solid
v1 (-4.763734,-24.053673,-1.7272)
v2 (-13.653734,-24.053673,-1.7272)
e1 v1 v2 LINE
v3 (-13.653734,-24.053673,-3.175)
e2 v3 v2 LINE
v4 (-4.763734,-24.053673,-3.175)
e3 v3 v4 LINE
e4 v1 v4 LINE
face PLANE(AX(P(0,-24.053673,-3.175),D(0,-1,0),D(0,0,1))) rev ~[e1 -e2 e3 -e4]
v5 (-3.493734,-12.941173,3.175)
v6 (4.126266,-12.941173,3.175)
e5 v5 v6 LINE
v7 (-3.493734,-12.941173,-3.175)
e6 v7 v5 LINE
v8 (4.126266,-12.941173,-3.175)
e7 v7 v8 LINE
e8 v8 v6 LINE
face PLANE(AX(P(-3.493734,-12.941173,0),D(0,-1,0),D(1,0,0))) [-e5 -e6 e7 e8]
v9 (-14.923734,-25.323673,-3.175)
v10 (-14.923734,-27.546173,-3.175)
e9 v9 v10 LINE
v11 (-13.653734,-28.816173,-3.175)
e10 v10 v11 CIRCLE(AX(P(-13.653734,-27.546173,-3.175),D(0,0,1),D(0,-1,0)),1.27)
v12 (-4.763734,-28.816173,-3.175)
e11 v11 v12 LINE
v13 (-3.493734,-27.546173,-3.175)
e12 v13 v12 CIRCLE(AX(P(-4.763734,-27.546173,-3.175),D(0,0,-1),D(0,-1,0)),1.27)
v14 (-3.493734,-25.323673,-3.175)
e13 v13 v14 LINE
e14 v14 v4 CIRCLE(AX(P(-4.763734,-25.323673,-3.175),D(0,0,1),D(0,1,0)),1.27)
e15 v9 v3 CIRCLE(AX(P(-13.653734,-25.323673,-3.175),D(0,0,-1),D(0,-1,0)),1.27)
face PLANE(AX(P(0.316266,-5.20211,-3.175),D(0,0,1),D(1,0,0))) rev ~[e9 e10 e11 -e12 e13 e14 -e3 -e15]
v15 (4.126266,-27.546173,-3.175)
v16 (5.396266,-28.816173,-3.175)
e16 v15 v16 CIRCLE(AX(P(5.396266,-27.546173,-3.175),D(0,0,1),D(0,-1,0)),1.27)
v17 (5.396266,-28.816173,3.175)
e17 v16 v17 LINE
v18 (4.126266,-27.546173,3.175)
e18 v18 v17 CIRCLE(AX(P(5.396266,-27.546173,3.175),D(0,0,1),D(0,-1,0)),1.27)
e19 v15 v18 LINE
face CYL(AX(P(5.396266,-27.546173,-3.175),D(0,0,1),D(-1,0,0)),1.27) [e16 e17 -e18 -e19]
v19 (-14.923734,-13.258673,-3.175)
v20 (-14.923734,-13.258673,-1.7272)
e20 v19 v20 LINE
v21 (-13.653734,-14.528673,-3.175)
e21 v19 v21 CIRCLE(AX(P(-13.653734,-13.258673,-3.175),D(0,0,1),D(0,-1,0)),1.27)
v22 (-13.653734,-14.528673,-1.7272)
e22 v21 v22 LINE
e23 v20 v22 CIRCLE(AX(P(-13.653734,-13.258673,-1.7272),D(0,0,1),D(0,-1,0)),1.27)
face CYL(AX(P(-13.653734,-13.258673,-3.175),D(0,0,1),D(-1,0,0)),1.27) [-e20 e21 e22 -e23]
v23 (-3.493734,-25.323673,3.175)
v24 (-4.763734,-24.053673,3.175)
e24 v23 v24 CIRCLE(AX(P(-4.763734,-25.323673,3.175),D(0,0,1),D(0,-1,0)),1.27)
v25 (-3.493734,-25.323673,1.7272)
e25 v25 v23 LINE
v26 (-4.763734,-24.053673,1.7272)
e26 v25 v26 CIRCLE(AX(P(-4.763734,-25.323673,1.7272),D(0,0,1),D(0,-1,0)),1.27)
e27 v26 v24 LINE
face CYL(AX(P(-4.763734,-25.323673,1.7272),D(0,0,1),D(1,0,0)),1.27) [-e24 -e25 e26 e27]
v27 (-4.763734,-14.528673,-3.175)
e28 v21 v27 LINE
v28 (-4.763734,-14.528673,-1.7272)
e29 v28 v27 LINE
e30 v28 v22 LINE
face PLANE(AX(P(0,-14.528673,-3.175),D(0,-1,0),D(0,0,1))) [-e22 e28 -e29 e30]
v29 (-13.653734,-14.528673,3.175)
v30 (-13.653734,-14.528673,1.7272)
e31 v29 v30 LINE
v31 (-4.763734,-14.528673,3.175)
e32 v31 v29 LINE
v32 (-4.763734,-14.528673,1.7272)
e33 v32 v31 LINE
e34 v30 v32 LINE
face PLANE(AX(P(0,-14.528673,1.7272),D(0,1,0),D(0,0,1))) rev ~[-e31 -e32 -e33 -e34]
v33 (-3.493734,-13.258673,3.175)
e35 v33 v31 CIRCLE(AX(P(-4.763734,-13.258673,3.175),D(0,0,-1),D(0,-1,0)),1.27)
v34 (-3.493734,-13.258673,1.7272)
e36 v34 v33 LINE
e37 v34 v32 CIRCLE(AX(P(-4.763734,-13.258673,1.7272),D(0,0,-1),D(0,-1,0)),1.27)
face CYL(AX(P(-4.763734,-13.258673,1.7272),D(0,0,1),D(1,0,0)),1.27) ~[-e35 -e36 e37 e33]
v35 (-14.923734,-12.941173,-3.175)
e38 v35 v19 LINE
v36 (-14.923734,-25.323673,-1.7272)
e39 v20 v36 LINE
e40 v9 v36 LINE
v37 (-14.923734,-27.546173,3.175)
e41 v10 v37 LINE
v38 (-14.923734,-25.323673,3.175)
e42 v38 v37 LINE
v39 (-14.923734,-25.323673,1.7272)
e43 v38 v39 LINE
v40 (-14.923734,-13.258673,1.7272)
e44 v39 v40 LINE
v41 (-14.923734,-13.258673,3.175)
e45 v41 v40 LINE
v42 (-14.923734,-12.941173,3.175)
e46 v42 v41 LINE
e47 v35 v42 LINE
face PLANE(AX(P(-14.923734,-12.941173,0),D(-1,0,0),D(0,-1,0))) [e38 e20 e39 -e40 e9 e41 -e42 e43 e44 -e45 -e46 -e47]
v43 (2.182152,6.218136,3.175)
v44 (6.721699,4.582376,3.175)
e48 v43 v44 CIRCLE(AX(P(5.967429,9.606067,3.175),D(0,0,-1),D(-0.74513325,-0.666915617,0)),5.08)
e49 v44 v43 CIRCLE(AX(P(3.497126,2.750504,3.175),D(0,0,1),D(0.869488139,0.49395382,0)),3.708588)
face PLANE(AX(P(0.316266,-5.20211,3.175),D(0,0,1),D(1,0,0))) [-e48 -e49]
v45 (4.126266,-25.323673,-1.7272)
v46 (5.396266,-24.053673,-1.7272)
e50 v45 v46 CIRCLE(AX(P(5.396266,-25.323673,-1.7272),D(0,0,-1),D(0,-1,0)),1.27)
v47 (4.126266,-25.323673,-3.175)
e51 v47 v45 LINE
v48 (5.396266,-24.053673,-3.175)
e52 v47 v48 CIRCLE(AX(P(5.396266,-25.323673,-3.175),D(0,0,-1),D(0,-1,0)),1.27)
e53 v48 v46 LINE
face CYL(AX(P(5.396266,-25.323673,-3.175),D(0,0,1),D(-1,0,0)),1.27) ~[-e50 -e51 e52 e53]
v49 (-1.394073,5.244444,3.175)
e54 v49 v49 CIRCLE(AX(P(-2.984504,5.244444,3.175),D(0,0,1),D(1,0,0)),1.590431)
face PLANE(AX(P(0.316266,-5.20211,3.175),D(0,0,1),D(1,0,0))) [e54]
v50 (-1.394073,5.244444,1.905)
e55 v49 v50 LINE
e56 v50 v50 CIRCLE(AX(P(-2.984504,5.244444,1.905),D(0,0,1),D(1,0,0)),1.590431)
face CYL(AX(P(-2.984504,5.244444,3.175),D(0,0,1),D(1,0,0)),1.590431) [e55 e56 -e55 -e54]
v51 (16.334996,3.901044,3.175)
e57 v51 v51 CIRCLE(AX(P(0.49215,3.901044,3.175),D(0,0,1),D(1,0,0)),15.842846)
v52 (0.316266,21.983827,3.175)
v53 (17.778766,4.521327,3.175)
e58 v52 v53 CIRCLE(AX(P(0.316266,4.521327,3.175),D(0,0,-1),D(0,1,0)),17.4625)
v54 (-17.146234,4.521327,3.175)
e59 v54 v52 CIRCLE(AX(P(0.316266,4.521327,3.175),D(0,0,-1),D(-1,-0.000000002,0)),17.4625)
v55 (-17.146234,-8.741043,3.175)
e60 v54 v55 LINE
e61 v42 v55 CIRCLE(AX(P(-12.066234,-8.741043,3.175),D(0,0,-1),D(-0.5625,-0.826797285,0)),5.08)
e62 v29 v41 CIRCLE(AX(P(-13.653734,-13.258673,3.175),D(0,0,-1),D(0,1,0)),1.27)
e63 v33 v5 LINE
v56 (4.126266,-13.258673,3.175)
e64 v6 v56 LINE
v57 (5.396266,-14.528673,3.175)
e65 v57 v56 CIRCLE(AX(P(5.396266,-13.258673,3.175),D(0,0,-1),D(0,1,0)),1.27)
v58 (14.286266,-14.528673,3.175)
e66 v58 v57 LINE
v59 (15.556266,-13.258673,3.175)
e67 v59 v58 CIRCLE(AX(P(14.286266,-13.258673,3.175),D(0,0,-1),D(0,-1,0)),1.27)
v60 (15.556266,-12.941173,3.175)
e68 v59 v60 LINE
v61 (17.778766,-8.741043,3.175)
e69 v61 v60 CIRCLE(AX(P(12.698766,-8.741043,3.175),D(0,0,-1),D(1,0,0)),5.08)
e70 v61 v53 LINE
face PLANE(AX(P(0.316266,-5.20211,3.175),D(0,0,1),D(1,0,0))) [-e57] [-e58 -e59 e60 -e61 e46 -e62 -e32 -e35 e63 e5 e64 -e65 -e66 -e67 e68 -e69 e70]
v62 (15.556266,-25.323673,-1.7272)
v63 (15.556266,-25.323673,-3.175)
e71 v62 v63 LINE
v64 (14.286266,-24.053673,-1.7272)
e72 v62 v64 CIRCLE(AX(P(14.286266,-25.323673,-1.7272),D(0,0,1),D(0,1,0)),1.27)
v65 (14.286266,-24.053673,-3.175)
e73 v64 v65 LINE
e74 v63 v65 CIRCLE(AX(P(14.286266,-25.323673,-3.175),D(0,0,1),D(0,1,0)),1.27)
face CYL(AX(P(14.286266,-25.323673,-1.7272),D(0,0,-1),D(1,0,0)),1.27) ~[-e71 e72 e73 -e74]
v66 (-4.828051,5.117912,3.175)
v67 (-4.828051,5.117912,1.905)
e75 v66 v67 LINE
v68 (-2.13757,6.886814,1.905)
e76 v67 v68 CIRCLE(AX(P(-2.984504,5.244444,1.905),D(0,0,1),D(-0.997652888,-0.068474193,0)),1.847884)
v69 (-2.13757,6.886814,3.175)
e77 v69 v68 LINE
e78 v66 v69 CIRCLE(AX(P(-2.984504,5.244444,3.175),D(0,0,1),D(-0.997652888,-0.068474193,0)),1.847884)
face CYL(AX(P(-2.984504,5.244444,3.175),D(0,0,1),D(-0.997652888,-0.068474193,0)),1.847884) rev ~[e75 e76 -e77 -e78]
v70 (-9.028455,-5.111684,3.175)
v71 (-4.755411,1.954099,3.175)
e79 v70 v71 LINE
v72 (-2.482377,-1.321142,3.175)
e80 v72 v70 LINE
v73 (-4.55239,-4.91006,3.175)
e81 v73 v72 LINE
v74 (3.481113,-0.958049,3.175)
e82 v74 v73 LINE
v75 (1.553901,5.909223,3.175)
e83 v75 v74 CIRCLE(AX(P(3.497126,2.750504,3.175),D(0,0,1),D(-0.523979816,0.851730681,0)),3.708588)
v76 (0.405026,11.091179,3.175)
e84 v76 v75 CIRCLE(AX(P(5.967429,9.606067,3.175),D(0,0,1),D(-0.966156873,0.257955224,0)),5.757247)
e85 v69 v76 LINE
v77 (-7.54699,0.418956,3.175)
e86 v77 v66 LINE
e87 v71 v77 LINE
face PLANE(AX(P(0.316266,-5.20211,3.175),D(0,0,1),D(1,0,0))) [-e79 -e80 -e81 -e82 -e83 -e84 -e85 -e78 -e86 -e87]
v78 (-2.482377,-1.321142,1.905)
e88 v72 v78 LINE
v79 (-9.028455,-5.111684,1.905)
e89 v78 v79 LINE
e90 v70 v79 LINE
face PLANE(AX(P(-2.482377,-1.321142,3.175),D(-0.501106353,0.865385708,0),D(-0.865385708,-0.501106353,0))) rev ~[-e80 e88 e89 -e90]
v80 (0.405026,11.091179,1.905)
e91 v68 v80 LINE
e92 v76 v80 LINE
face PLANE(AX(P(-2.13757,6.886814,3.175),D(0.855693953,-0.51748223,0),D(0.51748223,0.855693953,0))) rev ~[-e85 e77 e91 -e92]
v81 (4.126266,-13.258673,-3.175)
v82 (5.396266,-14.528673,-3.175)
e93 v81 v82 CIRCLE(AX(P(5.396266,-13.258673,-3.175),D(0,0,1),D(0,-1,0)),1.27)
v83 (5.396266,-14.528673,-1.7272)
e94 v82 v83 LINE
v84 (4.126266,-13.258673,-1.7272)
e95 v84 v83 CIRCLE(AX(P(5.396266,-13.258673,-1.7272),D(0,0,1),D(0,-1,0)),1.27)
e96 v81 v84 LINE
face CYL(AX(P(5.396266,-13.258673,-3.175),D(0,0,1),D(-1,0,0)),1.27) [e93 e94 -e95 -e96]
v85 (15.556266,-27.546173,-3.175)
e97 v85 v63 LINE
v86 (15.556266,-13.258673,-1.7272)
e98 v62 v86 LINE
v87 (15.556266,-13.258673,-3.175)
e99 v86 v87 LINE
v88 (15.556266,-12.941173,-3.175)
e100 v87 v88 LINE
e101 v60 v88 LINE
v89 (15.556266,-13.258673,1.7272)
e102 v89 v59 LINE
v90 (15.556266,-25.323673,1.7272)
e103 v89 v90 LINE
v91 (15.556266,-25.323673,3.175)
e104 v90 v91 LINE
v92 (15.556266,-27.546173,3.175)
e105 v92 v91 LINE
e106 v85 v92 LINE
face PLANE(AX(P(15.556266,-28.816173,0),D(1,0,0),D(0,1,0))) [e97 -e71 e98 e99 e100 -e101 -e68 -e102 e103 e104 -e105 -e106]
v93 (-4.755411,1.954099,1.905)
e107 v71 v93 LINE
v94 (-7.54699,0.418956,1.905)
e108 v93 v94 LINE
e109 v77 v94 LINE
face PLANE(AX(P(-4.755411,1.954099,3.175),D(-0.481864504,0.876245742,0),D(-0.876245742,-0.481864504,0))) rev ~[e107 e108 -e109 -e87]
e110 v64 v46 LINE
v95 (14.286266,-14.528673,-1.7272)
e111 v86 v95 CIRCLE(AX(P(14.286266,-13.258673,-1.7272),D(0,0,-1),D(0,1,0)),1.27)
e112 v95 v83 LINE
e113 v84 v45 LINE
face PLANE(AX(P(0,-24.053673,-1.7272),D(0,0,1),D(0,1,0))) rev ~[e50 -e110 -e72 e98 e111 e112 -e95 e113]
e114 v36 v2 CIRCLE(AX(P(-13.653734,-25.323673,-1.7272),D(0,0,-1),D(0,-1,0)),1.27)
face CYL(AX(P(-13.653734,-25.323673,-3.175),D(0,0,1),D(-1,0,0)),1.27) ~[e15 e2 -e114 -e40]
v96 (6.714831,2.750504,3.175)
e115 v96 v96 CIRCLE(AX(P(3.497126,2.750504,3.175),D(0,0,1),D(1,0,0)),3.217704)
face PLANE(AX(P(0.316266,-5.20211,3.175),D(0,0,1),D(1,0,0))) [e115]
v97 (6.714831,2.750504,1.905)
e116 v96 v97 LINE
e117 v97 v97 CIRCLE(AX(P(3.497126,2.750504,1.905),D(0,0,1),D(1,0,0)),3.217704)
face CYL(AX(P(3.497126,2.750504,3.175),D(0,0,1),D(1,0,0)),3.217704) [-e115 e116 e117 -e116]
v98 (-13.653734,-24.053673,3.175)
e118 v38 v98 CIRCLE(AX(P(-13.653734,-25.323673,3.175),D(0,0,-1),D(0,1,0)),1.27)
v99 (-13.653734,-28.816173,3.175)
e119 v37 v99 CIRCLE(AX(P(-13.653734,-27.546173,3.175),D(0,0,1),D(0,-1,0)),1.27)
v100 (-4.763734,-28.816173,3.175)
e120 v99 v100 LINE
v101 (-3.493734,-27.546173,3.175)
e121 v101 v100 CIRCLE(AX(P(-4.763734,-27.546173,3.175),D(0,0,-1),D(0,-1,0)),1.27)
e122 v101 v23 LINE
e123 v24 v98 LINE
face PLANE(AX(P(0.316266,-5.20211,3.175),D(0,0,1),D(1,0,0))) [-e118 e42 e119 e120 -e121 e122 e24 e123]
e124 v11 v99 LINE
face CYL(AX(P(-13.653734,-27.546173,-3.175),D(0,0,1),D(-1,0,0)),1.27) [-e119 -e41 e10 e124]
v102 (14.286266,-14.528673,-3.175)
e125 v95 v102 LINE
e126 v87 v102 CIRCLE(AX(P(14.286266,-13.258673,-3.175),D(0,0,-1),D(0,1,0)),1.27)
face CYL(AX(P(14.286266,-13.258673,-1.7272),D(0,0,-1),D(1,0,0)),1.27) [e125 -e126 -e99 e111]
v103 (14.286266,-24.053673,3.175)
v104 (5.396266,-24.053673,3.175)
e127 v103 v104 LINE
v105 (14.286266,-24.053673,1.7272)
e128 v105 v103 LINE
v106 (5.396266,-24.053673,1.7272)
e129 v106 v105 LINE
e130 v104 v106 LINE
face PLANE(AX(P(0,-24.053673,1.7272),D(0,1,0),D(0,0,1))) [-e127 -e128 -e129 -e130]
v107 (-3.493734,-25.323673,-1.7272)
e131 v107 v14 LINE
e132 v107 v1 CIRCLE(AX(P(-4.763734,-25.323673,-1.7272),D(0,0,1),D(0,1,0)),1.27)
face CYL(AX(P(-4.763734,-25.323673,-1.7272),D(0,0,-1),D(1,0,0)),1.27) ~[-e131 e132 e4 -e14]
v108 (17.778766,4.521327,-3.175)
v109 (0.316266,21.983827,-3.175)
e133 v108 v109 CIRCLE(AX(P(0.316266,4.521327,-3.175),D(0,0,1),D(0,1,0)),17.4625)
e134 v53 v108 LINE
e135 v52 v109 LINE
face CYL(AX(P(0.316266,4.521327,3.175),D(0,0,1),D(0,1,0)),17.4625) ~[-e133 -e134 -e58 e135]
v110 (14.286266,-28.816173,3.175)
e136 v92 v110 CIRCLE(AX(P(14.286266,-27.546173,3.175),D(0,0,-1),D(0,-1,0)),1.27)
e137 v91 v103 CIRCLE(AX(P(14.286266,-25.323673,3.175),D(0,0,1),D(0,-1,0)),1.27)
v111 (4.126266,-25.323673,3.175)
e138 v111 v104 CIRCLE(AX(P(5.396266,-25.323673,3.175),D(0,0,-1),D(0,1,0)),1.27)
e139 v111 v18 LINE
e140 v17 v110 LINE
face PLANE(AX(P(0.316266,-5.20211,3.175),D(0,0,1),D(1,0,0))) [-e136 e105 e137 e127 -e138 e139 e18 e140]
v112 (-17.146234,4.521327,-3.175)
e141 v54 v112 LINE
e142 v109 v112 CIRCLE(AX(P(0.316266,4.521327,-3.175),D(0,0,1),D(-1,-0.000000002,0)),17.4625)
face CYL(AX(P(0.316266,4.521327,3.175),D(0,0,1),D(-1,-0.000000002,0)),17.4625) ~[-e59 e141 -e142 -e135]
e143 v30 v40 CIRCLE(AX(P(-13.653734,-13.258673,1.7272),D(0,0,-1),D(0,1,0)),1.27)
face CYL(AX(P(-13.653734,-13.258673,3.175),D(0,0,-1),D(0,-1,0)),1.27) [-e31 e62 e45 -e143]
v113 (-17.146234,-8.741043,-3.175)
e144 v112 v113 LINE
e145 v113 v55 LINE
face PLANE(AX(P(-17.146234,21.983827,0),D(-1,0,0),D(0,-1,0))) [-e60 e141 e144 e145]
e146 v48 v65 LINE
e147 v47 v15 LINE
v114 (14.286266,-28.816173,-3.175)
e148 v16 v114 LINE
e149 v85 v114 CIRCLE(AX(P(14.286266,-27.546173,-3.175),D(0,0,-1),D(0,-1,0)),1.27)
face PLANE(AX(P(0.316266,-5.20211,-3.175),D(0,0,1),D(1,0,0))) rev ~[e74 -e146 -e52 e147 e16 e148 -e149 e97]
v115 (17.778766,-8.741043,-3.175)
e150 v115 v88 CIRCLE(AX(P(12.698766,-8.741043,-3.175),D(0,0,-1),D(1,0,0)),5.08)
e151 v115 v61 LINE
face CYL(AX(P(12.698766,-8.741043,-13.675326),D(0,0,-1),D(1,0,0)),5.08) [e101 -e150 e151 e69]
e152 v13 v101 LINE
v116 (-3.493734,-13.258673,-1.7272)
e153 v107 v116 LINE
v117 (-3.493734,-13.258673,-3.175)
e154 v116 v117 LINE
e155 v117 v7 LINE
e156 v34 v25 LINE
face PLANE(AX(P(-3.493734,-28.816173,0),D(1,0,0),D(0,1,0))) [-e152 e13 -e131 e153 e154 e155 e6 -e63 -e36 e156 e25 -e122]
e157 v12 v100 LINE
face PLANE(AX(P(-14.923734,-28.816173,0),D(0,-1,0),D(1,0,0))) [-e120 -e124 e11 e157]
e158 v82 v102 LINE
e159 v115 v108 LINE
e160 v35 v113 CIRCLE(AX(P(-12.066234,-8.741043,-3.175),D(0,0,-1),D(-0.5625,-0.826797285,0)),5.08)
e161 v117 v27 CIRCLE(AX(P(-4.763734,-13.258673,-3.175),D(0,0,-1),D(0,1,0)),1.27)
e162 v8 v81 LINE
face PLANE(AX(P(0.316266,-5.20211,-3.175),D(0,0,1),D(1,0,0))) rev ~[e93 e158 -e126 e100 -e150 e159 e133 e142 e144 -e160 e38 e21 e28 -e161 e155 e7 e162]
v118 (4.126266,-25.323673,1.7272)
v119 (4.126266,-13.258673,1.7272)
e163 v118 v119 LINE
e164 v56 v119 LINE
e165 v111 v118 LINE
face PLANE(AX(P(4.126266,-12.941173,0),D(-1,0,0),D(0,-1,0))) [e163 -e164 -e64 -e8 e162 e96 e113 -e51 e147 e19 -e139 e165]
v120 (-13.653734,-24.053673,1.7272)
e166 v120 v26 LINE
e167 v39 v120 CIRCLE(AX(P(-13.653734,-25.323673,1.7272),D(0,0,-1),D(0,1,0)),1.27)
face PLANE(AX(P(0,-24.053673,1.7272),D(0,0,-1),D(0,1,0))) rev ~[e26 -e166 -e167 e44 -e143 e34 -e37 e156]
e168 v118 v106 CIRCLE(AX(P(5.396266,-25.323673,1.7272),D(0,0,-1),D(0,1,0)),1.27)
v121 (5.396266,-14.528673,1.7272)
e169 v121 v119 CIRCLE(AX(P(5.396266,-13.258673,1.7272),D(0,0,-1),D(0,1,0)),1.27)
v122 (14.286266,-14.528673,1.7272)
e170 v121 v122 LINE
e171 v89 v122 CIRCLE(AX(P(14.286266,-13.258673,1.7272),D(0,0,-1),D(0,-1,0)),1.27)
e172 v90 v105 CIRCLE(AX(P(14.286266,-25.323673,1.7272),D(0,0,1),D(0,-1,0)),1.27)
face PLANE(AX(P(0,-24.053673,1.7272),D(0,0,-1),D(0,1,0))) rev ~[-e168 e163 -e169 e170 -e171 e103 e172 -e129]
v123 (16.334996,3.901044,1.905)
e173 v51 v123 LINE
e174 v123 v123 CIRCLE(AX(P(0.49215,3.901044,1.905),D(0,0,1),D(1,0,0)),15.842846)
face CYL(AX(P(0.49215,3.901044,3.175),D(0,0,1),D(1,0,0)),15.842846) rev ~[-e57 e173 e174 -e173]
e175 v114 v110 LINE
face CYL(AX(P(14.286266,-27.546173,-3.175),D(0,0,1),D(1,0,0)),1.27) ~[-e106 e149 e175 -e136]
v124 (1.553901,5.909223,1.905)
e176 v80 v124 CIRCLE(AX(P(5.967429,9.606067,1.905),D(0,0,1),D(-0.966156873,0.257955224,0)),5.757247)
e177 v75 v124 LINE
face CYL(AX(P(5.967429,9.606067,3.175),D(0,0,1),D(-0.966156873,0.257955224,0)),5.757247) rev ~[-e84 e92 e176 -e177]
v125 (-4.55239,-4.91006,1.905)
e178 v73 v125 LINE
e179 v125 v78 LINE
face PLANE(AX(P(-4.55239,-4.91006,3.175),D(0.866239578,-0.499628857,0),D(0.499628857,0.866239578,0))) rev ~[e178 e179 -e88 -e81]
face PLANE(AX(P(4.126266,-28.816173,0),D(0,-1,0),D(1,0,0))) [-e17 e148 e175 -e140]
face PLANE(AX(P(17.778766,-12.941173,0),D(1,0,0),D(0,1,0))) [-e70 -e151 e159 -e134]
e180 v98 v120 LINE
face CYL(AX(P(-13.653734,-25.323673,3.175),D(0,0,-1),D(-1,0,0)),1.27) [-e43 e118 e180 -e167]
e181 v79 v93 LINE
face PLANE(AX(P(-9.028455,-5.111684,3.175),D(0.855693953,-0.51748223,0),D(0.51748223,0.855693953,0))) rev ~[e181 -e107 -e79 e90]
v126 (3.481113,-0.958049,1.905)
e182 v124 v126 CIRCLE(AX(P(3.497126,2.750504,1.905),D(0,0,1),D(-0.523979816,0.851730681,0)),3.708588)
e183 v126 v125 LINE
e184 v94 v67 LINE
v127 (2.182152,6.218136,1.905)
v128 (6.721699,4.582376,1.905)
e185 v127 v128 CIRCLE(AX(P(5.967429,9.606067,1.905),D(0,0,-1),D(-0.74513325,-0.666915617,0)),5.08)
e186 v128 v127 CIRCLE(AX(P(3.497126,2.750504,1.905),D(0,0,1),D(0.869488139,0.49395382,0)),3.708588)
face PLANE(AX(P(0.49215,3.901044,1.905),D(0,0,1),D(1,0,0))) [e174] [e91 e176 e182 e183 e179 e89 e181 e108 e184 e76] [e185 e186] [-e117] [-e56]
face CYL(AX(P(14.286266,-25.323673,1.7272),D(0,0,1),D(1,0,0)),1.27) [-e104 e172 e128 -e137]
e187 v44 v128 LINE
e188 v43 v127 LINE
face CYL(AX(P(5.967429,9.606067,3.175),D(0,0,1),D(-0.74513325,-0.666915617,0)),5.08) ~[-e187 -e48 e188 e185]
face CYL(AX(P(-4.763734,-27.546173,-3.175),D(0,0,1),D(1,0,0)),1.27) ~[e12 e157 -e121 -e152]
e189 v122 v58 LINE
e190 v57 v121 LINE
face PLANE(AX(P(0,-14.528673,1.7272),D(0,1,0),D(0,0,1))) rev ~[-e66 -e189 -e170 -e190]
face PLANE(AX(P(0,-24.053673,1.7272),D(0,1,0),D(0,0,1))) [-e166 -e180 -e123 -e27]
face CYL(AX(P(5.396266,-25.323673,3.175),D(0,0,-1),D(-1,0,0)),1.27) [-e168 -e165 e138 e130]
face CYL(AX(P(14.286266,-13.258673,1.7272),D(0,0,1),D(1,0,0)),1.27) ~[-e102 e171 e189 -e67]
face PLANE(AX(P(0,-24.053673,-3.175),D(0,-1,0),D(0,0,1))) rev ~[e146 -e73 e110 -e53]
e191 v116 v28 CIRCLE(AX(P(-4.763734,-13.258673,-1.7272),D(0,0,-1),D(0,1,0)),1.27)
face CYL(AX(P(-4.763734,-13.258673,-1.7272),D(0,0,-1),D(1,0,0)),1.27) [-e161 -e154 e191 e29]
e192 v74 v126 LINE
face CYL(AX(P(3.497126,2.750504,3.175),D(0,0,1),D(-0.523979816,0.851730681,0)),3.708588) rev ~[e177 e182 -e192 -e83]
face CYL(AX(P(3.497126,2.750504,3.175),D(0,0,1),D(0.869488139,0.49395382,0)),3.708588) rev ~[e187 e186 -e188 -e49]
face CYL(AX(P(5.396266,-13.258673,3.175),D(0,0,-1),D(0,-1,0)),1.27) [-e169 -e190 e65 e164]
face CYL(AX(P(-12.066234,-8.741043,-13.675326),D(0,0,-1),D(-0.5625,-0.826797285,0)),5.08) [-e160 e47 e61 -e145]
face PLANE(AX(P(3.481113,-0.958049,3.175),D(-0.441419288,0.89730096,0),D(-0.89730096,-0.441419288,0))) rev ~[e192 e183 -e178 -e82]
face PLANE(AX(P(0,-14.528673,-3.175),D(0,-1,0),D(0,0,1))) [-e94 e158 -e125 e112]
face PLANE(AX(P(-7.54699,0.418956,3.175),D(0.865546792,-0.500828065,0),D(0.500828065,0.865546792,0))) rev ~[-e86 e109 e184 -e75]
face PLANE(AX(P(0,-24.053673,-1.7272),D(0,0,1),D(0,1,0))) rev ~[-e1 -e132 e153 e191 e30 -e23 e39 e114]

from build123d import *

# Parameters (mm, degrees)
F1_DEPTH    = 3.175
F2_W        = 9.525
F2_H        = 1.4478
F3_DEPTH    = 25.4
F4_R        = 15.842845787
F4_R_2      = 3.2177044056
F4_R_3      = 1.5904309239
F5_DEPTH    = 1.27
F6_T1_DEPTH = 31.75
F6_T3_DEPTH = 27.3506510316
F7_R        = 1.27
F9_DEPTH    = 25.4


# Not quite as in the source:
# - a fillet or chamfer that OpenCascade refuses, or shapes differently, is made with other operations: its cross-section is extruded or revolved along the edge and cut away or added


with BuildPart() as f1:
    # F0 (on Top) → F1 (new body, symmetric)
    with BuildSketch(Plane.XY):
        Polygon((17.7787664203, 21.9838270611), (-17.1462335797, 21.9838270611), (-17.1462335797, -12.9411729389), (-14.9237335797, -12.9411729389), (-14.9237335797, -28.8161729389), (-3.4937335797, -28.8161729389), (-3.4937335797, -12.9411729389), (4.1262664203, -12.9411729389), (4.1262664203, -28.8161729389), (15.5562664203, -28.8161729389), (15.5562664203, -12.9411729389), (17.7787664203, -12.9411729389), align=None)
    extrude(amount=F1_DEPTH, both=True)

    # F2 (on Right) → F3 (cut, symmetric)
    with BuildSketch(Plane.YZ):
        with Locations((-19.2911729389, -2.4511)):
            Rectangle(F2_W, F2_H)
        with Locations((-19.2911729389, 2.4511)):
            Rectangle(F2_W, F2_H)
    extrude(amount=F3_DEPTH, both=True, mode=Mode.SUBTRACT)

    # F4 (on face) → F5 (cut)
    with BuildSketch(Plane.XY.offset(3.175)):
        with Locations((0.4921501707, 3.9010436143)):
            Circle(F4_R)
        with BuildLine():
            Line((-2.1375703251, 6.8868143019), (0.4050256131, 11.0911789057))
            ThreePointArc((0.4050256131, 11.0911789057), (0.3466666466, 8.3599053372), (1.5539010716, 5.9092225511))
            ThreePointArc((1.5539010716, 5.9092225511), (-0.0735190255, 1.7484484648), (3.4811131017, -0.9580488308))
            Line((3.4811131017, -0.9580488308), (-4.5523895124, -4.9100595401))
            Line((-4.5523895124, -4.9100595401), (-2.4823771265, -1.3211422242))
            Line((-2.4823771265, -1.3211422242), (-9.0284545614, -5.1116843583))
            Line((-9.0284545614, -5.1116843583), (-4.7554110557, 1.9540993141))
            Line((-4.7554110557, 1.9540993141), (-7.5469899631, 0.4189560082))
            Line((-7.5469899631, 0.4189560082), (-4.8280507742, 5.1179121089))
            ThreePointArc((-4.8280507742, 5.1179121089), (-1.9693373897, 3.7003874584), (-2.1375703251, 6.8868143019))
        make_face(mode=Mode.SUBTRACT)
        with Locations((3.4971262654, 2.7505044746)):
            Circle(F4_R_2, mode=Mode.SUBTRACT)
        with Locations((-2.9845039712, 5.2444444735)):
            Circle(F4_R_3, mode=Mode.SUBTRACT)
        with BuildLine():
            ThreePointArc((2.1821519983, 6.218135758), (7.6895432258, 14.3852639145), (6.7216994367, 4.5823756229))
            ThreePointArc((6.7216994367, 4.5823756229), (4.7543334077, 6.2394949077), (2.1821519983, 6.218135758))
        make_face(mode=Mode.SUBTRACT)
    extrude(amount=-F5_DEPTH, mode=Mode.SUBTRACT)

    # F6: fillet of radius 5.08 on 4 edges, made by hand

    # F6_s2 → F6_t1 (cut)
    with BuildSketch(Plane.XY.offset(-15.875)):
        with BuildLine():
            ThreePointArc((17.7787664203, 16.9038270611), (16.2908688687, 20.4959295096), (12.6987664203, 21.9838270611))
            Line((12.6987664203, 21.9838270611), (17.7787664203, 21.9838270611))
            Line((17.7787664203, 21.9838270611), (17.7787664203, 16.9038270611))
        make_face()
        with BuildLine():
            ThreePointArc((-12.0662335797, 21.9838270611), (-15.6583360282, 20.4959295096), (-17.1462335797, 16.9038270611))
            Line((-17.1462335797, 16.9038270611), (-17.1462335797, 21.9838270611))
            Line((-17.1462335797, 21.9838270611), (-12.0662335797, 21.9838270611))
        make_face()
    extrude(amount=F6_T1_DEPTH, mode=Mode.SUBTRACT)

    # F6_s4 → F6_t3 (cut)
    with BuildSketch(Plane.XY.offset(-13.6753255158)):
        with BuildLine():
            ThreePointArc((-14.9237335797, -12.9411729388), (-16.5563616403, -11.1169951731), (-17.1462335797, -8.7410427325))
            Line((-17.1462335797, -8.7410427325), (-17.1462335797, -12.9411729389))
            Line((-17.1462335797, -12.9411729389), (-14.9237335797, -12.9411729388))
        make_face()
        with BuildLine():
            ThreePointArc((17.7787664203, -8.7410427325), (17.1888944808, -11.1169951731), (15.5562664203, -12.9411729388))
            Line((15.5562664203, -12.9411729388), (17.7787664203, -12.9411729389))
            Line((17.7787664203, -12.9411729389), (17.7787664203, -8.7410427325))
        make_face()
    extrude(amount=F6_T3_DEPTH, mode=Mode.SUBTRACT)

    # F7
    f7_edges = [f1.edges().sort_by_distance(p)[0] for p in [
        (-14.923734, -14.528673, 2.4511),
        (-3.493734, -14.528673, 2.4511),
        (15.556266, -14.528673, 2.4511),
        (4.126266, -14.528673, 2.4511),
        (15.556266, -14.528673, -2.4511),
        (4.126266, -14.528673, -2.4511),
        (-14.923734, -14.528673, -2.4511),
        (-3.493734, -14.528673, -2.4511),
        (-3.493734, -24.053673, -2.4511),
        (-3.493734, -24.053673, 2.4511),
        (15.556266, -24.053673, -2.4511),
        (15.556266, -24.053673, 2.4511),
        (15.556266, -28.816173, 0),
        (4.126266, -28.816173, 0),
        (-3.493734, -28.816173, 0),
        (-14.923734, -28.816173, 0),
        (-14.923734, -24.053673, 2.4511),
        (-14.923734, -24.053673, -2.4511),
        (4.126266, -24.053673, 2.4511),
        (4.126266, -24.053673, -2.4511),
    ]]
    fillet(f7_edges, radius=F7_R)

    # F8 (on face) → F9 (cut)
    with BuildSketch(Plane.XY.offset(3.175)):
        with BuildLine():
            ThreePointArc((-17.1462335797, 16.9038270611), (-15.6583360282, 20.4959295096), (-12.0662335797, 21.9838270611))
            Line((-12.0662335797, 21.9838270611), (-17.1462335797, 21.9838270611))
            Line((-17.1462335797, 21.9838270611), (-17.1462335797, 16.9038270611))
        make_face()
        with BuildLine():
            ThreePointArc((12.6987664203, 21.9838270611), (16.2908688687, 20.4959295095), (17.7787664203, 16.9038270611))
            Line((17.7787664203, 16.9038270611), (17.7787664203, 21.9838270611))
            Line((17.7787664203, 21.9838270611), (12.6987664203, 21.9838270611))
        make_face()
        with BuildLine():
            ThreePointArc((0.3162664203, 21.9838270611), (12.6641185867, 16.8691792276), (17.7787664203, 4.5213270611))
            Line((17.7787664203, 4.5213270611), (17.7787664203, 16.9038270611))
            ThreePointArc((17.7787664203, 16.9038270611), (16.2908688687, 20.4959295095), (12.6987664203, 21.9838270611))
            Line((12.6987664203, 21.9838270611), (0.3162664203, 21.9838270611))
        make_face()
        with BuildLine():
            ThreePointArc((-17.1462335797, 4.5213270326), (-12.0315857563, 16.8691792175), (0.3162664203, 21.9838270611))
            Line((0.3162664203, 21.9838270611), (-12.0662335797, 21.9838270611))
            ThreePointArc((-12.0662335797, 21.9838270611), (-15.6583360282, 20.4959295096), (-17.1462335797, 16.9038270611))
            Line((-17.1462335797, 16.9038270611), (-17.1462335797, 4.5213270326))
        make_face()
    extrude(amount=-F9_DEPTH, mode=Mode.SUBTRACT)


solid = f1.part
